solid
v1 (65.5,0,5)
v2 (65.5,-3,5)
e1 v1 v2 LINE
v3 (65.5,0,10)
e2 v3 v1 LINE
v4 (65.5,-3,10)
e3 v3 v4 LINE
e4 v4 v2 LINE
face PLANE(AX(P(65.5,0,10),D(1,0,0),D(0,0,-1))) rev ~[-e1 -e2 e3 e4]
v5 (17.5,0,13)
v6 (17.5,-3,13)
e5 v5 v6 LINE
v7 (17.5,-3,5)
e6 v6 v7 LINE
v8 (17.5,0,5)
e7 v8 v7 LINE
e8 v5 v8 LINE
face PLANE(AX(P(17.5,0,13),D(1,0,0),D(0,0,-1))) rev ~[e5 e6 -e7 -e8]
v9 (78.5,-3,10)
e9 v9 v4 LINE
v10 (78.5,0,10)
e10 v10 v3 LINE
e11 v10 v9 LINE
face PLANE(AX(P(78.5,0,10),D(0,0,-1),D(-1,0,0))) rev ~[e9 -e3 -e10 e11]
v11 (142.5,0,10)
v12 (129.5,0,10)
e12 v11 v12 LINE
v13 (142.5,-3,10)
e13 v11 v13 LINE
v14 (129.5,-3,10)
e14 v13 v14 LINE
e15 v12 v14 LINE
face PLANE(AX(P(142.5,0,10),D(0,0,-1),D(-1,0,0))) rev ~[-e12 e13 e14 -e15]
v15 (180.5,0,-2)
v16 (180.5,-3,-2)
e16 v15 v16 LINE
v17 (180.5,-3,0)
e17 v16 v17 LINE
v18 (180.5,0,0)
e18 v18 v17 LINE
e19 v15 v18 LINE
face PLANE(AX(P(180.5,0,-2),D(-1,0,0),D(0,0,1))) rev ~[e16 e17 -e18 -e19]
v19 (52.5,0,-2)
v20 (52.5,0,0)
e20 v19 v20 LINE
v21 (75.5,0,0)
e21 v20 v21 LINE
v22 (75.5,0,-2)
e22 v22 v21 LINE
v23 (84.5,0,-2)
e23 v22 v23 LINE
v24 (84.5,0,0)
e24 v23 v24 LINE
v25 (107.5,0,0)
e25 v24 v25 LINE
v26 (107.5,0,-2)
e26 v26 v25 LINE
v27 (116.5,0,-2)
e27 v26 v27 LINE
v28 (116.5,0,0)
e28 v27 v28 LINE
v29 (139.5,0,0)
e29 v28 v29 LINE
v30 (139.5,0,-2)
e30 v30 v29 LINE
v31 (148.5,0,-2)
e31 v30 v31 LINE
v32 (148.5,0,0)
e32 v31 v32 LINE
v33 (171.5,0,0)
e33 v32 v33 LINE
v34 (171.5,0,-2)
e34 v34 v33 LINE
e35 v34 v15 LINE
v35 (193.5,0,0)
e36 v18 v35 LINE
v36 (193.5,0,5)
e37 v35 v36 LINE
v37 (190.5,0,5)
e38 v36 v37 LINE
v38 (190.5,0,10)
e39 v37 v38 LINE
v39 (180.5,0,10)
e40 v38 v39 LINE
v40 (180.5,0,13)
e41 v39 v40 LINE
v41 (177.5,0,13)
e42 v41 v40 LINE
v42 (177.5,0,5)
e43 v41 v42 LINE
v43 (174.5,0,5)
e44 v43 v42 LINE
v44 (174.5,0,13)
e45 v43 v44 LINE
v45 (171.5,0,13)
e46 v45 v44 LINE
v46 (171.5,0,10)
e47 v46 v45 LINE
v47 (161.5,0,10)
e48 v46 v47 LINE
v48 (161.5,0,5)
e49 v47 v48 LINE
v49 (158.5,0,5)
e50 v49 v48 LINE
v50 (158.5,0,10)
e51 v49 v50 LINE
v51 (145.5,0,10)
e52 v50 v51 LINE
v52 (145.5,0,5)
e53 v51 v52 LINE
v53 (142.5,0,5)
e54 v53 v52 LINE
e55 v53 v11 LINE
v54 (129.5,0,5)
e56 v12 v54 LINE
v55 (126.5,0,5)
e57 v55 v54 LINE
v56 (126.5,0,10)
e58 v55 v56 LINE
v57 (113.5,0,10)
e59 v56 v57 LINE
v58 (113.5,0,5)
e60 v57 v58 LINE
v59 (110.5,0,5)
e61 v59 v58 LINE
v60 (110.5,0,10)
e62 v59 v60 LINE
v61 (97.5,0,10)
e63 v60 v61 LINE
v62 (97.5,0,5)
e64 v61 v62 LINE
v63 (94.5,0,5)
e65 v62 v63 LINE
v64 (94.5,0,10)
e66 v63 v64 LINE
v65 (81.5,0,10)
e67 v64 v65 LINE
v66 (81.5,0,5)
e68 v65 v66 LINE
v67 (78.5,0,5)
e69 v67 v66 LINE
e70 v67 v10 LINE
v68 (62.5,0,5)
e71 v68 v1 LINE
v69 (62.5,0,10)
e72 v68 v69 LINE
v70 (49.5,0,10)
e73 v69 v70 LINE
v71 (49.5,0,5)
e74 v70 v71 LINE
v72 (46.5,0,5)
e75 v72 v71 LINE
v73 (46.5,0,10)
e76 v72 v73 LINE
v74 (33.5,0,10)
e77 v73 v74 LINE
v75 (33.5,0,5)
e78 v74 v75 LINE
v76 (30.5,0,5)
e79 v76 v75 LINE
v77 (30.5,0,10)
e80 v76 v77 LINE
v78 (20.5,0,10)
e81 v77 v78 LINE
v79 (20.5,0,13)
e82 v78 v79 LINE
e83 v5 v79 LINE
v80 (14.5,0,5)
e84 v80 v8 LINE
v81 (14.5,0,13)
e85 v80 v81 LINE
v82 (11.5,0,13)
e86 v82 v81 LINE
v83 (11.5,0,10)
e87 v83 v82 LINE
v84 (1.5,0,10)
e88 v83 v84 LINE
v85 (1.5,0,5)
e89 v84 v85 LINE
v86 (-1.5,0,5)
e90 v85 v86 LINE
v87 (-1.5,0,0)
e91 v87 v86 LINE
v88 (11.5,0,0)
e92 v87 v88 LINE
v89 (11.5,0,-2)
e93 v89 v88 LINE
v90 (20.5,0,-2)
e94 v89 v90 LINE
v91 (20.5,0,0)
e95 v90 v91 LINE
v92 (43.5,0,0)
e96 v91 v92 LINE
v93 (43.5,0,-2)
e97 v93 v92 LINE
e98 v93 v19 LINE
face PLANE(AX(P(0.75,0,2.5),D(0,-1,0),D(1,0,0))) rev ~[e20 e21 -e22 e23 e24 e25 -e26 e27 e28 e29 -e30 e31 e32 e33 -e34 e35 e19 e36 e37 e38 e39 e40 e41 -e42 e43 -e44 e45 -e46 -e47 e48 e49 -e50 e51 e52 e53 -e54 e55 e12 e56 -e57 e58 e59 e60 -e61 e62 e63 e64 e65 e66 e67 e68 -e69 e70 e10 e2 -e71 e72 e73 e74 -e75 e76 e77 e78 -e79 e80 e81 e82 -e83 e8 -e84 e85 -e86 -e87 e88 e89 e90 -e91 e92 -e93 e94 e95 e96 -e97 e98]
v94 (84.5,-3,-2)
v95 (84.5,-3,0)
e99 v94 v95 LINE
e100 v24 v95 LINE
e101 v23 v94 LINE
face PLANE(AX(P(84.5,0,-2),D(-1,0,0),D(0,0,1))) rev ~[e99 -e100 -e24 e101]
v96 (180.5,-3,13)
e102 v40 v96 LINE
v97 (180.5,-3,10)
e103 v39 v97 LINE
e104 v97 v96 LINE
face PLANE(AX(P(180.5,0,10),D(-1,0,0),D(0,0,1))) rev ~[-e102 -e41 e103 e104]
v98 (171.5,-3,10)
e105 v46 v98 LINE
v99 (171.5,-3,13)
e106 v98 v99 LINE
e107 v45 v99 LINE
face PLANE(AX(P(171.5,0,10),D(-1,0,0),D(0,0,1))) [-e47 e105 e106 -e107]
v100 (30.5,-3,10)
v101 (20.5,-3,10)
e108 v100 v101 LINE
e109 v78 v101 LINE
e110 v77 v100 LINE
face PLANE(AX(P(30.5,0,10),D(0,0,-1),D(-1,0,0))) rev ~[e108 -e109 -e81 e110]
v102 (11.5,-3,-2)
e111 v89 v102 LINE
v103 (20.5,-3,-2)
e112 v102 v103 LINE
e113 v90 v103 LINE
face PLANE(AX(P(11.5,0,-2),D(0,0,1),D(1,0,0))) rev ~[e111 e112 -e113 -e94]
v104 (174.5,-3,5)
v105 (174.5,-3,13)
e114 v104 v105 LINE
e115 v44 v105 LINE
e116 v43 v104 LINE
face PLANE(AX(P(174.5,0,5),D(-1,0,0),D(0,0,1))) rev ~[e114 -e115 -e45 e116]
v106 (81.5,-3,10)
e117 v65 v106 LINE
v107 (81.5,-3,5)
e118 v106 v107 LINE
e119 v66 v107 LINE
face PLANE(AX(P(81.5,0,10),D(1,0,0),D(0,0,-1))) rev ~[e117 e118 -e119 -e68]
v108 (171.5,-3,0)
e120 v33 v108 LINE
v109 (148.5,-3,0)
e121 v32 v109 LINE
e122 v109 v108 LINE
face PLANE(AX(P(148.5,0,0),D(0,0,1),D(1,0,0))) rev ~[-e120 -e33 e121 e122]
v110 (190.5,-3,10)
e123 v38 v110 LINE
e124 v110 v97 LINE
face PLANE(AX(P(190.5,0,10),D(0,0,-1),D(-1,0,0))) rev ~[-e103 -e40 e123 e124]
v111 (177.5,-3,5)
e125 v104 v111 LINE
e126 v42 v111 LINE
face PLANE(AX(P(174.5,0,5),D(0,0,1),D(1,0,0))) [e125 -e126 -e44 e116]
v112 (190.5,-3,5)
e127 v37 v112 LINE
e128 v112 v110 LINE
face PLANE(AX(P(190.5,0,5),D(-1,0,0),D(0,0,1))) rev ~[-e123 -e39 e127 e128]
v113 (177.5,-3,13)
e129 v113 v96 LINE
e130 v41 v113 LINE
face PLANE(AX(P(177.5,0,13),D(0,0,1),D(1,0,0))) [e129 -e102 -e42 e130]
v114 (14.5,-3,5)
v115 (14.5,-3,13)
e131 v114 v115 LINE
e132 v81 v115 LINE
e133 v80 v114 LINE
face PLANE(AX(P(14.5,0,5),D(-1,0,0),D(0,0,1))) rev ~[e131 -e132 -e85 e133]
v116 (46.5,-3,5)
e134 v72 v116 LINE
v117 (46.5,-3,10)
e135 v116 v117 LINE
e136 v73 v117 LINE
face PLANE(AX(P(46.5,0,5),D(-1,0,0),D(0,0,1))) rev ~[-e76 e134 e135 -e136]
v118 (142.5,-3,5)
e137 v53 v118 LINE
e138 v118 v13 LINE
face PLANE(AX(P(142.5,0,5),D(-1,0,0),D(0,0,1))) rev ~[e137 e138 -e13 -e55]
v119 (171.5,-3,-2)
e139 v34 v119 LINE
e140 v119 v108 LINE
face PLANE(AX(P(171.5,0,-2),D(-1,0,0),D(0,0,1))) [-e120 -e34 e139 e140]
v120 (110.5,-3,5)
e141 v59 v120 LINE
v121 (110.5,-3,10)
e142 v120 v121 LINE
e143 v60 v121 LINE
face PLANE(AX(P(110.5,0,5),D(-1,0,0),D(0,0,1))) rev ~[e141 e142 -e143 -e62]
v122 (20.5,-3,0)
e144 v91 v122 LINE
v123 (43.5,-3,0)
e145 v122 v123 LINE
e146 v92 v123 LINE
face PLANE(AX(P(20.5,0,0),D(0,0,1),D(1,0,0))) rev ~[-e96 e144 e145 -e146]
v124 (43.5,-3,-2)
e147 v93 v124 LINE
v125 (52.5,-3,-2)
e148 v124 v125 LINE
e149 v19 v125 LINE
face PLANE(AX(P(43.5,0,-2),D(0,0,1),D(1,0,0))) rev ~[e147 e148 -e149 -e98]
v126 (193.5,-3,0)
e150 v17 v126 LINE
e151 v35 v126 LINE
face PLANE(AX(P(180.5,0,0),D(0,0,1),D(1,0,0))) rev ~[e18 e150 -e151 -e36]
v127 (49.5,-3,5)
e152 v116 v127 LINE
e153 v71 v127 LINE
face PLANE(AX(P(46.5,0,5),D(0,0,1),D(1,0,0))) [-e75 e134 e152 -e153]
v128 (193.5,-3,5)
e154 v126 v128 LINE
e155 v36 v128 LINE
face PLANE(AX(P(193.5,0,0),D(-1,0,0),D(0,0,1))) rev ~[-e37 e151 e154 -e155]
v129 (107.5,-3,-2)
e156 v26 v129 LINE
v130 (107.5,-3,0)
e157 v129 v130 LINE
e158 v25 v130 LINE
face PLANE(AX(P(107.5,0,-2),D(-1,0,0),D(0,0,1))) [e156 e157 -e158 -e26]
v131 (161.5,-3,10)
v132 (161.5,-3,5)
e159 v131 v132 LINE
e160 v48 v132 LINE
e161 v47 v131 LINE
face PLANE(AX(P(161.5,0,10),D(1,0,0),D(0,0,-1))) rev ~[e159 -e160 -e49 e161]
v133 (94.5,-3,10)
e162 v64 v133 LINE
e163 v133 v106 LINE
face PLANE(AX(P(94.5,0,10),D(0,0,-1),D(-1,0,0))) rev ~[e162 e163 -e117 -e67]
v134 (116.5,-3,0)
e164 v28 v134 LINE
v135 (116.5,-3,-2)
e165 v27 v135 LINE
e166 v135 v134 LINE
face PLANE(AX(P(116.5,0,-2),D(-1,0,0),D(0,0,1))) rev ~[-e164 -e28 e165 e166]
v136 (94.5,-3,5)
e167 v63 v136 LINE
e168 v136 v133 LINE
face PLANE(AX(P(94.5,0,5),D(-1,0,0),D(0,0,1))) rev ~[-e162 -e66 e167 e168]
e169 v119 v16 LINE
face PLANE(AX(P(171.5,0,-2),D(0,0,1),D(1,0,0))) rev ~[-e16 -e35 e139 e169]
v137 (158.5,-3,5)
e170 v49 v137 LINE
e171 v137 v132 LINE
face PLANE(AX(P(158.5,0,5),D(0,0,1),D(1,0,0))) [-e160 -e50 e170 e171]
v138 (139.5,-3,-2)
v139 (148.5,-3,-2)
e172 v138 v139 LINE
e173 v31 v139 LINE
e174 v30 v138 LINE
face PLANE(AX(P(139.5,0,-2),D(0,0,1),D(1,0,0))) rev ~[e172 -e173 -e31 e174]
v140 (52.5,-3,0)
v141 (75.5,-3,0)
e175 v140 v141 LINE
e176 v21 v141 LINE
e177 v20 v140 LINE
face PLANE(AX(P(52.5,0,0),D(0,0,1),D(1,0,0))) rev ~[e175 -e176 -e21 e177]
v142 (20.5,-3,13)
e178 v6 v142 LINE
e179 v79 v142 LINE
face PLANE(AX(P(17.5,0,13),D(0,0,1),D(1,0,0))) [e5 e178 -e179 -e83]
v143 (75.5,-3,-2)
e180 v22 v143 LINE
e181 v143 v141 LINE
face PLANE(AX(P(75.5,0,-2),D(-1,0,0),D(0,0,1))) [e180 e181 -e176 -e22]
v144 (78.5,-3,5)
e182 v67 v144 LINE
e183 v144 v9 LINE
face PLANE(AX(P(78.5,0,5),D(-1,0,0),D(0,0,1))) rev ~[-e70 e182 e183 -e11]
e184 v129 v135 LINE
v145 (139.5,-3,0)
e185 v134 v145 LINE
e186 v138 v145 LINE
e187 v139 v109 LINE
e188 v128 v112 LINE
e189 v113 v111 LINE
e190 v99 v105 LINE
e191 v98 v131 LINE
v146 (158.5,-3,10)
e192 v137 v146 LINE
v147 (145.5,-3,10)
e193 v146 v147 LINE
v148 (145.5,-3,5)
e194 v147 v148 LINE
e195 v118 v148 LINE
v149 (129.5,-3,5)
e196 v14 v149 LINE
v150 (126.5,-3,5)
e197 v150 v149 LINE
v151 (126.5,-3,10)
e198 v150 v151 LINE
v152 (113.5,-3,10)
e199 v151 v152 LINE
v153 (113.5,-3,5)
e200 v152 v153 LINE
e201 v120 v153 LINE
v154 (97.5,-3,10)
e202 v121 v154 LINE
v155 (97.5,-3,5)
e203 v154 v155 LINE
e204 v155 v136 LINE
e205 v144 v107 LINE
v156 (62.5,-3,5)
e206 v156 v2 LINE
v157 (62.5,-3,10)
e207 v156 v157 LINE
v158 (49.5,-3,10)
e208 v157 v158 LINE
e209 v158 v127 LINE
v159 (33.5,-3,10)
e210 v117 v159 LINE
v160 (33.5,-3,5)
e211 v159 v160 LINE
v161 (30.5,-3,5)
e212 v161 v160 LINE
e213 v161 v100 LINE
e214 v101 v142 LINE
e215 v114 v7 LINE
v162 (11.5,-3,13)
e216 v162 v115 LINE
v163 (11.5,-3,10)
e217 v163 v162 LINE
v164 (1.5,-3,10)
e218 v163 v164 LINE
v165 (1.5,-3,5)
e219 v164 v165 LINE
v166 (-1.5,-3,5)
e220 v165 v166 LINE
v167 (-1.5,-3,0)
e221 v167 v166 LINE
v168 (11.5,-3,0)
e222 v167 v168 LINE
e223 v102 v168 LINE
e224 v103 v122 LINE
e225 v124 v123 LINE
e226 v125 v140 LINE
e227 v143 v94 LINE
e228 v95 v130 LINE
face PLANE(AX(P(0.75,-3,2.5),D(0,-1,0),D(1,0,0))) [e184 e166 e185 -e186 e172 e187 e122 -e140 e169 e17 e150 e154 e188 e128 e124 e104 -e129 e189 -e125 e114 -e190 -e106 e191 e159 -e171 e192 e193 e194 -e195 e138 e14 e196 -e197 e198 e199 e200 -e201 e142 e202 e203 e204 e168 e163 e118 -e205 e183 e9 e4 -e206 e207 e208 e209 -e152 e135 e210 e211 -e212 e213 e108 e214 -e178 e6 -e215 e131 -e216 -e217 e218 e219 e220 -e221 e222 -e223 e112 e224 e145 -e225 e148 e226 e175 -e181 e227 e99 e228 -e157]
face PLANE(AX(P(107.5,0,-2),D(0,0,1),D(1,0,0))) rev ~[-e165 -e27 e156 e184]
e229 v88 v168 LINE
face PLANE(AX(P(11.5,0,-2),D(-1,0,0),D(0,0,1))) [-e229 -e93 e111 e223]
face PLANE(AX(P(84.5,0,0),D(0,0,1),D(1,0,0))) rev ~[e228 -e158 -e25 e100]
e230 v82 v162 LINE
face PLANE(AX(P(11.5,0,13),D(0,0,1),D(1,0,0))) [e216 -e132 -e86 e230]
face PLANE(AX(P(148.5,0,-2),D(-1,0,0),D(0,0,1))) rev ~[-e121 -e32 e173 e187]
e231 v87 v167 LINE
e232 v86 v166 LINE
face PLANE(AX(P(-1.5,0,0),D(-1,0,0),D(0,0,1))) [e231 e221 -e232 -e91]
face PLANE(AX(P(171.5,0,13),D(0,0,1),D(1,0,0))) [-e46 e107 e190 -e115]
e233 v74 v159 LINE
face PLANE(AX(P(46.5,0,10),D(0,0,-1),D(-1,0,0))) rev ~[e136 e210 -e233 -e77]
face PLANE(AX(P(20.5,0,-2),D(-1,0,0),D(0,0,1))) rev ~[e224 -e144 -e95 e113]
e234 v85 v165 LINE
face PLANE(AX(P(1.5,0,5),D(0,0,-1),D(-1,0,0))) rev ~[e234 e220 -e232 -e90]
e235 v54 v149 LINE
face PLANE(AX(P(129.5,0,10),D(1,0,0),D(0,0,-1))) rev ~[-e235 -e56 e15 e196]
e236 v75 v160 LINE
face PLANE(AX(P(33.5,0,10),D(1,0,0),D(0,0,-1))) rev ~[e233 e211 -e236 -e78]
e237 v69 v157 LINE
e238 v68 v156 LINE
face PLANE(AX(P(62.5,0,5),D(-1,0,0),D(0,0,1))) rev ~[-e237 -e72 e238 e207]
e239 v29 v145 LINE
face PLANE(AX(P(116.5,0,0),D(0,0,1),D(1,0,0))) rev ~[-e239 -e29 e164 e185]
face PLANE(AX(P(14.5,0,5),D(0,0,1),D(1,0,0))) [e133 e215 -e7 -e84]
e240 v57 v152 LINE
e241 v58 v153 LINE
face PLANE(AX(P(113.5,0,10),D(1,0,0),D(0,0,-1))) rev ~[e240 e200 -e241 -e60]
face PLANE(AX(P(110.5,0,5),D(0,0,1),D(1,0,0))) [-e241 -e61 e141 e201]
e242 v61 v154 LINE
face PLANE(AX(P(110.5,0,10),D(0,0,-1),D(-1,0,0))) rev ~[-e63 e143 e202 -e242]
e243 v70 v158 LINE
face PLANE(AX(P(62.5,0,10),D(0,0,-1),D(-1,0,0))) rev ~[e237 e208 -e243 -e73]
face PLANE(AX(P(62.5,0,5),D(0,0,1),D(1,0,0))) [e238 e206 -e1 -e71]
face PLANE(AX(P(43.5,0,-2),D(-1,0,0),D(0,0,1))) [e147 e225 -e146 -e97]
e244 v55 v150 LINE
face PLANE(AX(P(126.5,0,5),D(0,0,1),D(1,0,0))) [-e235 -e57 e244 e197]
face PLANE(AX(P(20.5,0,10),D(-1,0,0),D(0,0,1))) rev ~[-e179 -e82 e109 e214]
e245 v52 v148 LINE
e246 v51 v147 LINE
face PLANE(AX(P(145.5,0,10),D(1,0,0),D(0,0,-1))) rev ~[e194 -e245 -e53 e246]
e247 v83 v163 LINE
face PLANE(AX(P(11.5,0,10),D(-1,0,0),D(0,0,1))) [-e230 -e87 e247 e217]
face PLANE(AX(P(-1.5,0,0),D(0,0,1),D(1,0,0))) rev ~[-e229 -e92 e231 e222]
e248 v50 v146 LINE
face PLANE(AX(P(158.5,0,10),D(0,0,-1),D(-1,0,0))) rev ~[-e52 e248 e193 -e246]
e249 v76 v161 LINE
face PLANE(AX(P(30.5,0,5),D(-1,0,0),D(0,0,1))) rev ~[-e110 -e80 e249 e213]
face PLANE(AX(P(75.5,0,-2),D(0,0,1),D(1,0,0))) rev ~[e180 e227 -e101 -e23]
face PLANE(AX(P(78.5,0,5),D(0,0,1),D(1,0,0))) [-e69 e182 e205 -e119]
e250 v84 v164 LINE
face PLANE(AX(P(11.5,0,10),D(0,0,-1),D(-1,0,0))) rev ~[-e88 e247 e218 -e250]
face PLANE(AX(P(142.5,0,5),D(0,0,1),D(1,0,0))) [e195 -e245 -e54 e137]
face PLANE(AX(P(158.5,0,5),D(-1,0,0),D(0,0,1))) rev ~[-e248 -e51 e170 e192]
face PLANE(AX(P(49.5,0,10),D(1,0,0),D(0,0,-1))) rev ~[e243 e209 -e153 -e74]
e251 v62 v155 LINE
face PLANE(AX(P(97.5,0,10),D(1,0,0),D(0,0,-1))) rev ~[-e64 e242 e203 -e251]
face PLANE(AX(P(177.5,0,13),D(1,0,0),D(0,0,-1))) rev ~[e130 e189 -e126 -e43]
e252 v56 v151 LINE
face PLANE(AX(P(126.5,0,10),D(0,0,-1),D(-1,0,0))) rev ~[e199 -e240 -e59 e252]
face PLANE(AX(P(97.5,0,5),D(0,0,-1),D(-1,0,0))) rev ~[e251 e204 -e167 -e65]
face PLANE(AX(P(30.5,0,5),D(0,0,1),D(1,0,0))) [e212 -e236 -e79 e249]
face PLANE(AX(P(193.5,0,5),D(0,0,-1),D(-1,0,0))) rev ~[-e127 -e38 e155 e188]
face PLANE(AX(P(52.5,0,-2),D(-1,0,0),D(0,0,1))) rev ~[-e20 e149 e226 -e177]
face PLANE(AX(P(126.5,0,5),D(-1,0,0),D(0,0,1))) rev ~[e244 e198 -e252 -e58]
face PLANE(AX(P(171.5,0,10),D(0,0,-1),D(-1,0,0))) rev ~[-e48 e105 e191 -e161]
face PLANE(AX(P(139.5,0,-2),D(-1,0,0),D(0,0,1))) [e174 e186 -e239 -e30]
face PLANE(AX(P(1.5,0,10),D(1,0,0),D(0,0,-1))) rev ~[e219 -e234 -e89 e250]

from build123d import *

# Parameters (mm, degrees)
F0_W     = 1.5
F0_H     = 5
F0_W_2   = 3
F0_H_2   = 2
F0_H_3   = 3
F1_DEPTH = 3


# Not quite as in the source:
# - a feature names something its author has since deleted; it is built from what else it names


with BuildPart() as f1:
    # F0 (on Front) → F1 (new body)
    with BuildSketch(Plane.XZ):
        with Locations((0.75, 2.5)):
            Rectangle(F0_W, F0_H)
        with Locations((-0.75, 2.5)):
            Rectangle(F0_W, F0_H)
        Polygon((1.5, 5), (1.5, 0), (11.5, 0), (14.5, 0), (14.5, 5), (14.5, 10), (11.5, 10), (1.5, 10), align=None)
        with Locations((13, -1)):
            Rectangle(F0_W_2, F0_H_2)
        with Locations((16, -1)):
            Rectangle(F0_W_2, F0_H_2)
        with Locations((16, 2.5)):
            Rectangle(F0_W_2, F0_H)
        with Locations((19, -1)):
            Rectangle(F0_W_2, F0_H_2)
        Polygon((17.5, 5), (17.5, 0), (20.5, 0), (30.5, 0), (30.5, 5), (30.5, 10), (20.5, 10), (17.5, 10), align=None)
        with Locations((13, 11.5)):
            Rectangle(F0_W_2, F0_H_3)
        with Locations((19, 11.5)):
            Rectangle(F0_W_2, F0_H_3)
        with Locations((32, 2.5)):
            Rectangle(F0_W_2, F0_H)
        Polygon((33.5, 5), (33.5, 0), (43.5, 0), (46.5, 0), (46.5, 5), (46.5, 10), (33.5, 10), align=None)
        with Locations((45, -1)):
            Rectangle(F0_W_2, F0_H_2)
        with Locations((48, -1)):
            Rectangle(F0_W_2, F0_H_2)
        with Locations((48, 2.5)):
            Rectangle(F0_W_2, F0_H)
        with Locations((51, -1)):
            Rectangle(F0_W_2, F0_H_2)
        Polygon((49.5, 5), (49.5, 0), (52.5, 0), (62.5, 0), (62.5, 5), (62.5, 10), (49.5, 10), align=None)
        with Locations((64, 2.5)):
            Rectangle(F0_W_2, F0_H)
        Polygon((78.5, 10), (65.5, 10), (65.5, 5), (65.5, 0), (75.5, 0), (78.5, 0), (78.5, 5), align=None)
        with Locations((77, -1)):
            Rectangle(F0_W_2, F0_H_2)
        Polygon((94.5, 10), (81.5, 10), (81.5, 5), (81.5, 0), (84.5, 0), (94.5, 0), (94.5, 5), align=None)
        with Locations((80, 2.5)):
            Rectangle(F0_W_2, F0_H)
        with Locations((80, -1)):
            Rectangle(F0_W_2, F0_H_2)
        with Locations((83, -1)):
            Rectangle(F0_W_2, F0_H_2)
        with Locations((95.25, 2.5)):
            Rectangle(F0_W, F0_H)
        with Locations((96.75, 2.5)):
            Rectangle(F0_W, F0_H)
        Polygon((110.5, 10), (97.5, 10), (97.5, 5), (97.5, 0), (107.5, 0), (110.5, 0), (110.5, 5), align=None)
        Polygon((126.5, 10), (113.5, 10), (113.5, 5), (113.5, 0), (116.5, 0), (126.5, 0), (126.5, 5), align=None)
        with Locations((112, 2.5)):
            Rectangle(F0_W_2, F0_H)
        with Locations((109, -1)):
            Rectangle(F0_W_2, F0_H_2)
        with Locations((112, -1)):
            Rectangle(F0_W_2, F0_H_2)
        with Locations((115, -1)):
            Rectangle(F0_W_2, F0_H_2)
        Polygon((142.5, 10), (129.5, 10), (129.5, 5), (129.5, 0), (139.5, 0), (142.5, 0), (142.5, 5), align=None)
        with Locations((128, 2.5)):
            Rectangle(F0_W_2, F0_H)
        Polygon((158.5, 10), (145.5, 10), (145.5, 5), (145.5, 0), (148.5, 0), (158.5, 0), (158.5, 5), align=None)
        with Locations((144, 2.5)):
            Rectangle(F0_W_2, F0_H)
        with Locations((144, -1)):
            Rectangle(F0_W_2, F0_H_2)
        with Locations((141, -1)):
            Rectangle(F0_W_2, F0_H_2)
        with Locations((147, -1)):
            Rectangle(F0_W_2, F0_H_2)
        with Locations((160, 2.5)):
            Rectangle(F0_W_2, F0_H)
        Polygon((171.5, 10), (161.5, 10), (161.5, 5), (161.5, 0), (171.5, 0), (174.5, 0), (174.5, 5), (174.5, 10), align=None)
        with Locations((173, 11.5)):
            Rectangle(F0_W_2, F0_H_3)
        with Locations((173, -1)):
            Rectangle(F0_W_2, F0_H_2)
        Polygon((180.5, 10), (177.5, 10), (177.5, 5), (177.5, 0), (180.5, 0), (190.5, 0), (190.5, 5), (190.5, 10), align=None)
        with Locations((179, 11.5)):
            Rectangle(F0_W_2, F0_H_3)
        with Locations((176, 2.5)):
            Rectangle(F0_W_2, F0_H)
        with Locations((176, -1)):
            Rectangle(F0_W_2, F0_H_2)
        with Locations((179, -1)):
            Rectangle(F0_W_2, F0_H_2)
        with Locations((191.25, 2.5)):
            Rectangle(F0_W, F0_H)
        with Locations((192.75, 2.5)):
            Rectangle(F0_W, F0_H)
    extrude(amount=F1_DEPTH)


solid = f1.part
